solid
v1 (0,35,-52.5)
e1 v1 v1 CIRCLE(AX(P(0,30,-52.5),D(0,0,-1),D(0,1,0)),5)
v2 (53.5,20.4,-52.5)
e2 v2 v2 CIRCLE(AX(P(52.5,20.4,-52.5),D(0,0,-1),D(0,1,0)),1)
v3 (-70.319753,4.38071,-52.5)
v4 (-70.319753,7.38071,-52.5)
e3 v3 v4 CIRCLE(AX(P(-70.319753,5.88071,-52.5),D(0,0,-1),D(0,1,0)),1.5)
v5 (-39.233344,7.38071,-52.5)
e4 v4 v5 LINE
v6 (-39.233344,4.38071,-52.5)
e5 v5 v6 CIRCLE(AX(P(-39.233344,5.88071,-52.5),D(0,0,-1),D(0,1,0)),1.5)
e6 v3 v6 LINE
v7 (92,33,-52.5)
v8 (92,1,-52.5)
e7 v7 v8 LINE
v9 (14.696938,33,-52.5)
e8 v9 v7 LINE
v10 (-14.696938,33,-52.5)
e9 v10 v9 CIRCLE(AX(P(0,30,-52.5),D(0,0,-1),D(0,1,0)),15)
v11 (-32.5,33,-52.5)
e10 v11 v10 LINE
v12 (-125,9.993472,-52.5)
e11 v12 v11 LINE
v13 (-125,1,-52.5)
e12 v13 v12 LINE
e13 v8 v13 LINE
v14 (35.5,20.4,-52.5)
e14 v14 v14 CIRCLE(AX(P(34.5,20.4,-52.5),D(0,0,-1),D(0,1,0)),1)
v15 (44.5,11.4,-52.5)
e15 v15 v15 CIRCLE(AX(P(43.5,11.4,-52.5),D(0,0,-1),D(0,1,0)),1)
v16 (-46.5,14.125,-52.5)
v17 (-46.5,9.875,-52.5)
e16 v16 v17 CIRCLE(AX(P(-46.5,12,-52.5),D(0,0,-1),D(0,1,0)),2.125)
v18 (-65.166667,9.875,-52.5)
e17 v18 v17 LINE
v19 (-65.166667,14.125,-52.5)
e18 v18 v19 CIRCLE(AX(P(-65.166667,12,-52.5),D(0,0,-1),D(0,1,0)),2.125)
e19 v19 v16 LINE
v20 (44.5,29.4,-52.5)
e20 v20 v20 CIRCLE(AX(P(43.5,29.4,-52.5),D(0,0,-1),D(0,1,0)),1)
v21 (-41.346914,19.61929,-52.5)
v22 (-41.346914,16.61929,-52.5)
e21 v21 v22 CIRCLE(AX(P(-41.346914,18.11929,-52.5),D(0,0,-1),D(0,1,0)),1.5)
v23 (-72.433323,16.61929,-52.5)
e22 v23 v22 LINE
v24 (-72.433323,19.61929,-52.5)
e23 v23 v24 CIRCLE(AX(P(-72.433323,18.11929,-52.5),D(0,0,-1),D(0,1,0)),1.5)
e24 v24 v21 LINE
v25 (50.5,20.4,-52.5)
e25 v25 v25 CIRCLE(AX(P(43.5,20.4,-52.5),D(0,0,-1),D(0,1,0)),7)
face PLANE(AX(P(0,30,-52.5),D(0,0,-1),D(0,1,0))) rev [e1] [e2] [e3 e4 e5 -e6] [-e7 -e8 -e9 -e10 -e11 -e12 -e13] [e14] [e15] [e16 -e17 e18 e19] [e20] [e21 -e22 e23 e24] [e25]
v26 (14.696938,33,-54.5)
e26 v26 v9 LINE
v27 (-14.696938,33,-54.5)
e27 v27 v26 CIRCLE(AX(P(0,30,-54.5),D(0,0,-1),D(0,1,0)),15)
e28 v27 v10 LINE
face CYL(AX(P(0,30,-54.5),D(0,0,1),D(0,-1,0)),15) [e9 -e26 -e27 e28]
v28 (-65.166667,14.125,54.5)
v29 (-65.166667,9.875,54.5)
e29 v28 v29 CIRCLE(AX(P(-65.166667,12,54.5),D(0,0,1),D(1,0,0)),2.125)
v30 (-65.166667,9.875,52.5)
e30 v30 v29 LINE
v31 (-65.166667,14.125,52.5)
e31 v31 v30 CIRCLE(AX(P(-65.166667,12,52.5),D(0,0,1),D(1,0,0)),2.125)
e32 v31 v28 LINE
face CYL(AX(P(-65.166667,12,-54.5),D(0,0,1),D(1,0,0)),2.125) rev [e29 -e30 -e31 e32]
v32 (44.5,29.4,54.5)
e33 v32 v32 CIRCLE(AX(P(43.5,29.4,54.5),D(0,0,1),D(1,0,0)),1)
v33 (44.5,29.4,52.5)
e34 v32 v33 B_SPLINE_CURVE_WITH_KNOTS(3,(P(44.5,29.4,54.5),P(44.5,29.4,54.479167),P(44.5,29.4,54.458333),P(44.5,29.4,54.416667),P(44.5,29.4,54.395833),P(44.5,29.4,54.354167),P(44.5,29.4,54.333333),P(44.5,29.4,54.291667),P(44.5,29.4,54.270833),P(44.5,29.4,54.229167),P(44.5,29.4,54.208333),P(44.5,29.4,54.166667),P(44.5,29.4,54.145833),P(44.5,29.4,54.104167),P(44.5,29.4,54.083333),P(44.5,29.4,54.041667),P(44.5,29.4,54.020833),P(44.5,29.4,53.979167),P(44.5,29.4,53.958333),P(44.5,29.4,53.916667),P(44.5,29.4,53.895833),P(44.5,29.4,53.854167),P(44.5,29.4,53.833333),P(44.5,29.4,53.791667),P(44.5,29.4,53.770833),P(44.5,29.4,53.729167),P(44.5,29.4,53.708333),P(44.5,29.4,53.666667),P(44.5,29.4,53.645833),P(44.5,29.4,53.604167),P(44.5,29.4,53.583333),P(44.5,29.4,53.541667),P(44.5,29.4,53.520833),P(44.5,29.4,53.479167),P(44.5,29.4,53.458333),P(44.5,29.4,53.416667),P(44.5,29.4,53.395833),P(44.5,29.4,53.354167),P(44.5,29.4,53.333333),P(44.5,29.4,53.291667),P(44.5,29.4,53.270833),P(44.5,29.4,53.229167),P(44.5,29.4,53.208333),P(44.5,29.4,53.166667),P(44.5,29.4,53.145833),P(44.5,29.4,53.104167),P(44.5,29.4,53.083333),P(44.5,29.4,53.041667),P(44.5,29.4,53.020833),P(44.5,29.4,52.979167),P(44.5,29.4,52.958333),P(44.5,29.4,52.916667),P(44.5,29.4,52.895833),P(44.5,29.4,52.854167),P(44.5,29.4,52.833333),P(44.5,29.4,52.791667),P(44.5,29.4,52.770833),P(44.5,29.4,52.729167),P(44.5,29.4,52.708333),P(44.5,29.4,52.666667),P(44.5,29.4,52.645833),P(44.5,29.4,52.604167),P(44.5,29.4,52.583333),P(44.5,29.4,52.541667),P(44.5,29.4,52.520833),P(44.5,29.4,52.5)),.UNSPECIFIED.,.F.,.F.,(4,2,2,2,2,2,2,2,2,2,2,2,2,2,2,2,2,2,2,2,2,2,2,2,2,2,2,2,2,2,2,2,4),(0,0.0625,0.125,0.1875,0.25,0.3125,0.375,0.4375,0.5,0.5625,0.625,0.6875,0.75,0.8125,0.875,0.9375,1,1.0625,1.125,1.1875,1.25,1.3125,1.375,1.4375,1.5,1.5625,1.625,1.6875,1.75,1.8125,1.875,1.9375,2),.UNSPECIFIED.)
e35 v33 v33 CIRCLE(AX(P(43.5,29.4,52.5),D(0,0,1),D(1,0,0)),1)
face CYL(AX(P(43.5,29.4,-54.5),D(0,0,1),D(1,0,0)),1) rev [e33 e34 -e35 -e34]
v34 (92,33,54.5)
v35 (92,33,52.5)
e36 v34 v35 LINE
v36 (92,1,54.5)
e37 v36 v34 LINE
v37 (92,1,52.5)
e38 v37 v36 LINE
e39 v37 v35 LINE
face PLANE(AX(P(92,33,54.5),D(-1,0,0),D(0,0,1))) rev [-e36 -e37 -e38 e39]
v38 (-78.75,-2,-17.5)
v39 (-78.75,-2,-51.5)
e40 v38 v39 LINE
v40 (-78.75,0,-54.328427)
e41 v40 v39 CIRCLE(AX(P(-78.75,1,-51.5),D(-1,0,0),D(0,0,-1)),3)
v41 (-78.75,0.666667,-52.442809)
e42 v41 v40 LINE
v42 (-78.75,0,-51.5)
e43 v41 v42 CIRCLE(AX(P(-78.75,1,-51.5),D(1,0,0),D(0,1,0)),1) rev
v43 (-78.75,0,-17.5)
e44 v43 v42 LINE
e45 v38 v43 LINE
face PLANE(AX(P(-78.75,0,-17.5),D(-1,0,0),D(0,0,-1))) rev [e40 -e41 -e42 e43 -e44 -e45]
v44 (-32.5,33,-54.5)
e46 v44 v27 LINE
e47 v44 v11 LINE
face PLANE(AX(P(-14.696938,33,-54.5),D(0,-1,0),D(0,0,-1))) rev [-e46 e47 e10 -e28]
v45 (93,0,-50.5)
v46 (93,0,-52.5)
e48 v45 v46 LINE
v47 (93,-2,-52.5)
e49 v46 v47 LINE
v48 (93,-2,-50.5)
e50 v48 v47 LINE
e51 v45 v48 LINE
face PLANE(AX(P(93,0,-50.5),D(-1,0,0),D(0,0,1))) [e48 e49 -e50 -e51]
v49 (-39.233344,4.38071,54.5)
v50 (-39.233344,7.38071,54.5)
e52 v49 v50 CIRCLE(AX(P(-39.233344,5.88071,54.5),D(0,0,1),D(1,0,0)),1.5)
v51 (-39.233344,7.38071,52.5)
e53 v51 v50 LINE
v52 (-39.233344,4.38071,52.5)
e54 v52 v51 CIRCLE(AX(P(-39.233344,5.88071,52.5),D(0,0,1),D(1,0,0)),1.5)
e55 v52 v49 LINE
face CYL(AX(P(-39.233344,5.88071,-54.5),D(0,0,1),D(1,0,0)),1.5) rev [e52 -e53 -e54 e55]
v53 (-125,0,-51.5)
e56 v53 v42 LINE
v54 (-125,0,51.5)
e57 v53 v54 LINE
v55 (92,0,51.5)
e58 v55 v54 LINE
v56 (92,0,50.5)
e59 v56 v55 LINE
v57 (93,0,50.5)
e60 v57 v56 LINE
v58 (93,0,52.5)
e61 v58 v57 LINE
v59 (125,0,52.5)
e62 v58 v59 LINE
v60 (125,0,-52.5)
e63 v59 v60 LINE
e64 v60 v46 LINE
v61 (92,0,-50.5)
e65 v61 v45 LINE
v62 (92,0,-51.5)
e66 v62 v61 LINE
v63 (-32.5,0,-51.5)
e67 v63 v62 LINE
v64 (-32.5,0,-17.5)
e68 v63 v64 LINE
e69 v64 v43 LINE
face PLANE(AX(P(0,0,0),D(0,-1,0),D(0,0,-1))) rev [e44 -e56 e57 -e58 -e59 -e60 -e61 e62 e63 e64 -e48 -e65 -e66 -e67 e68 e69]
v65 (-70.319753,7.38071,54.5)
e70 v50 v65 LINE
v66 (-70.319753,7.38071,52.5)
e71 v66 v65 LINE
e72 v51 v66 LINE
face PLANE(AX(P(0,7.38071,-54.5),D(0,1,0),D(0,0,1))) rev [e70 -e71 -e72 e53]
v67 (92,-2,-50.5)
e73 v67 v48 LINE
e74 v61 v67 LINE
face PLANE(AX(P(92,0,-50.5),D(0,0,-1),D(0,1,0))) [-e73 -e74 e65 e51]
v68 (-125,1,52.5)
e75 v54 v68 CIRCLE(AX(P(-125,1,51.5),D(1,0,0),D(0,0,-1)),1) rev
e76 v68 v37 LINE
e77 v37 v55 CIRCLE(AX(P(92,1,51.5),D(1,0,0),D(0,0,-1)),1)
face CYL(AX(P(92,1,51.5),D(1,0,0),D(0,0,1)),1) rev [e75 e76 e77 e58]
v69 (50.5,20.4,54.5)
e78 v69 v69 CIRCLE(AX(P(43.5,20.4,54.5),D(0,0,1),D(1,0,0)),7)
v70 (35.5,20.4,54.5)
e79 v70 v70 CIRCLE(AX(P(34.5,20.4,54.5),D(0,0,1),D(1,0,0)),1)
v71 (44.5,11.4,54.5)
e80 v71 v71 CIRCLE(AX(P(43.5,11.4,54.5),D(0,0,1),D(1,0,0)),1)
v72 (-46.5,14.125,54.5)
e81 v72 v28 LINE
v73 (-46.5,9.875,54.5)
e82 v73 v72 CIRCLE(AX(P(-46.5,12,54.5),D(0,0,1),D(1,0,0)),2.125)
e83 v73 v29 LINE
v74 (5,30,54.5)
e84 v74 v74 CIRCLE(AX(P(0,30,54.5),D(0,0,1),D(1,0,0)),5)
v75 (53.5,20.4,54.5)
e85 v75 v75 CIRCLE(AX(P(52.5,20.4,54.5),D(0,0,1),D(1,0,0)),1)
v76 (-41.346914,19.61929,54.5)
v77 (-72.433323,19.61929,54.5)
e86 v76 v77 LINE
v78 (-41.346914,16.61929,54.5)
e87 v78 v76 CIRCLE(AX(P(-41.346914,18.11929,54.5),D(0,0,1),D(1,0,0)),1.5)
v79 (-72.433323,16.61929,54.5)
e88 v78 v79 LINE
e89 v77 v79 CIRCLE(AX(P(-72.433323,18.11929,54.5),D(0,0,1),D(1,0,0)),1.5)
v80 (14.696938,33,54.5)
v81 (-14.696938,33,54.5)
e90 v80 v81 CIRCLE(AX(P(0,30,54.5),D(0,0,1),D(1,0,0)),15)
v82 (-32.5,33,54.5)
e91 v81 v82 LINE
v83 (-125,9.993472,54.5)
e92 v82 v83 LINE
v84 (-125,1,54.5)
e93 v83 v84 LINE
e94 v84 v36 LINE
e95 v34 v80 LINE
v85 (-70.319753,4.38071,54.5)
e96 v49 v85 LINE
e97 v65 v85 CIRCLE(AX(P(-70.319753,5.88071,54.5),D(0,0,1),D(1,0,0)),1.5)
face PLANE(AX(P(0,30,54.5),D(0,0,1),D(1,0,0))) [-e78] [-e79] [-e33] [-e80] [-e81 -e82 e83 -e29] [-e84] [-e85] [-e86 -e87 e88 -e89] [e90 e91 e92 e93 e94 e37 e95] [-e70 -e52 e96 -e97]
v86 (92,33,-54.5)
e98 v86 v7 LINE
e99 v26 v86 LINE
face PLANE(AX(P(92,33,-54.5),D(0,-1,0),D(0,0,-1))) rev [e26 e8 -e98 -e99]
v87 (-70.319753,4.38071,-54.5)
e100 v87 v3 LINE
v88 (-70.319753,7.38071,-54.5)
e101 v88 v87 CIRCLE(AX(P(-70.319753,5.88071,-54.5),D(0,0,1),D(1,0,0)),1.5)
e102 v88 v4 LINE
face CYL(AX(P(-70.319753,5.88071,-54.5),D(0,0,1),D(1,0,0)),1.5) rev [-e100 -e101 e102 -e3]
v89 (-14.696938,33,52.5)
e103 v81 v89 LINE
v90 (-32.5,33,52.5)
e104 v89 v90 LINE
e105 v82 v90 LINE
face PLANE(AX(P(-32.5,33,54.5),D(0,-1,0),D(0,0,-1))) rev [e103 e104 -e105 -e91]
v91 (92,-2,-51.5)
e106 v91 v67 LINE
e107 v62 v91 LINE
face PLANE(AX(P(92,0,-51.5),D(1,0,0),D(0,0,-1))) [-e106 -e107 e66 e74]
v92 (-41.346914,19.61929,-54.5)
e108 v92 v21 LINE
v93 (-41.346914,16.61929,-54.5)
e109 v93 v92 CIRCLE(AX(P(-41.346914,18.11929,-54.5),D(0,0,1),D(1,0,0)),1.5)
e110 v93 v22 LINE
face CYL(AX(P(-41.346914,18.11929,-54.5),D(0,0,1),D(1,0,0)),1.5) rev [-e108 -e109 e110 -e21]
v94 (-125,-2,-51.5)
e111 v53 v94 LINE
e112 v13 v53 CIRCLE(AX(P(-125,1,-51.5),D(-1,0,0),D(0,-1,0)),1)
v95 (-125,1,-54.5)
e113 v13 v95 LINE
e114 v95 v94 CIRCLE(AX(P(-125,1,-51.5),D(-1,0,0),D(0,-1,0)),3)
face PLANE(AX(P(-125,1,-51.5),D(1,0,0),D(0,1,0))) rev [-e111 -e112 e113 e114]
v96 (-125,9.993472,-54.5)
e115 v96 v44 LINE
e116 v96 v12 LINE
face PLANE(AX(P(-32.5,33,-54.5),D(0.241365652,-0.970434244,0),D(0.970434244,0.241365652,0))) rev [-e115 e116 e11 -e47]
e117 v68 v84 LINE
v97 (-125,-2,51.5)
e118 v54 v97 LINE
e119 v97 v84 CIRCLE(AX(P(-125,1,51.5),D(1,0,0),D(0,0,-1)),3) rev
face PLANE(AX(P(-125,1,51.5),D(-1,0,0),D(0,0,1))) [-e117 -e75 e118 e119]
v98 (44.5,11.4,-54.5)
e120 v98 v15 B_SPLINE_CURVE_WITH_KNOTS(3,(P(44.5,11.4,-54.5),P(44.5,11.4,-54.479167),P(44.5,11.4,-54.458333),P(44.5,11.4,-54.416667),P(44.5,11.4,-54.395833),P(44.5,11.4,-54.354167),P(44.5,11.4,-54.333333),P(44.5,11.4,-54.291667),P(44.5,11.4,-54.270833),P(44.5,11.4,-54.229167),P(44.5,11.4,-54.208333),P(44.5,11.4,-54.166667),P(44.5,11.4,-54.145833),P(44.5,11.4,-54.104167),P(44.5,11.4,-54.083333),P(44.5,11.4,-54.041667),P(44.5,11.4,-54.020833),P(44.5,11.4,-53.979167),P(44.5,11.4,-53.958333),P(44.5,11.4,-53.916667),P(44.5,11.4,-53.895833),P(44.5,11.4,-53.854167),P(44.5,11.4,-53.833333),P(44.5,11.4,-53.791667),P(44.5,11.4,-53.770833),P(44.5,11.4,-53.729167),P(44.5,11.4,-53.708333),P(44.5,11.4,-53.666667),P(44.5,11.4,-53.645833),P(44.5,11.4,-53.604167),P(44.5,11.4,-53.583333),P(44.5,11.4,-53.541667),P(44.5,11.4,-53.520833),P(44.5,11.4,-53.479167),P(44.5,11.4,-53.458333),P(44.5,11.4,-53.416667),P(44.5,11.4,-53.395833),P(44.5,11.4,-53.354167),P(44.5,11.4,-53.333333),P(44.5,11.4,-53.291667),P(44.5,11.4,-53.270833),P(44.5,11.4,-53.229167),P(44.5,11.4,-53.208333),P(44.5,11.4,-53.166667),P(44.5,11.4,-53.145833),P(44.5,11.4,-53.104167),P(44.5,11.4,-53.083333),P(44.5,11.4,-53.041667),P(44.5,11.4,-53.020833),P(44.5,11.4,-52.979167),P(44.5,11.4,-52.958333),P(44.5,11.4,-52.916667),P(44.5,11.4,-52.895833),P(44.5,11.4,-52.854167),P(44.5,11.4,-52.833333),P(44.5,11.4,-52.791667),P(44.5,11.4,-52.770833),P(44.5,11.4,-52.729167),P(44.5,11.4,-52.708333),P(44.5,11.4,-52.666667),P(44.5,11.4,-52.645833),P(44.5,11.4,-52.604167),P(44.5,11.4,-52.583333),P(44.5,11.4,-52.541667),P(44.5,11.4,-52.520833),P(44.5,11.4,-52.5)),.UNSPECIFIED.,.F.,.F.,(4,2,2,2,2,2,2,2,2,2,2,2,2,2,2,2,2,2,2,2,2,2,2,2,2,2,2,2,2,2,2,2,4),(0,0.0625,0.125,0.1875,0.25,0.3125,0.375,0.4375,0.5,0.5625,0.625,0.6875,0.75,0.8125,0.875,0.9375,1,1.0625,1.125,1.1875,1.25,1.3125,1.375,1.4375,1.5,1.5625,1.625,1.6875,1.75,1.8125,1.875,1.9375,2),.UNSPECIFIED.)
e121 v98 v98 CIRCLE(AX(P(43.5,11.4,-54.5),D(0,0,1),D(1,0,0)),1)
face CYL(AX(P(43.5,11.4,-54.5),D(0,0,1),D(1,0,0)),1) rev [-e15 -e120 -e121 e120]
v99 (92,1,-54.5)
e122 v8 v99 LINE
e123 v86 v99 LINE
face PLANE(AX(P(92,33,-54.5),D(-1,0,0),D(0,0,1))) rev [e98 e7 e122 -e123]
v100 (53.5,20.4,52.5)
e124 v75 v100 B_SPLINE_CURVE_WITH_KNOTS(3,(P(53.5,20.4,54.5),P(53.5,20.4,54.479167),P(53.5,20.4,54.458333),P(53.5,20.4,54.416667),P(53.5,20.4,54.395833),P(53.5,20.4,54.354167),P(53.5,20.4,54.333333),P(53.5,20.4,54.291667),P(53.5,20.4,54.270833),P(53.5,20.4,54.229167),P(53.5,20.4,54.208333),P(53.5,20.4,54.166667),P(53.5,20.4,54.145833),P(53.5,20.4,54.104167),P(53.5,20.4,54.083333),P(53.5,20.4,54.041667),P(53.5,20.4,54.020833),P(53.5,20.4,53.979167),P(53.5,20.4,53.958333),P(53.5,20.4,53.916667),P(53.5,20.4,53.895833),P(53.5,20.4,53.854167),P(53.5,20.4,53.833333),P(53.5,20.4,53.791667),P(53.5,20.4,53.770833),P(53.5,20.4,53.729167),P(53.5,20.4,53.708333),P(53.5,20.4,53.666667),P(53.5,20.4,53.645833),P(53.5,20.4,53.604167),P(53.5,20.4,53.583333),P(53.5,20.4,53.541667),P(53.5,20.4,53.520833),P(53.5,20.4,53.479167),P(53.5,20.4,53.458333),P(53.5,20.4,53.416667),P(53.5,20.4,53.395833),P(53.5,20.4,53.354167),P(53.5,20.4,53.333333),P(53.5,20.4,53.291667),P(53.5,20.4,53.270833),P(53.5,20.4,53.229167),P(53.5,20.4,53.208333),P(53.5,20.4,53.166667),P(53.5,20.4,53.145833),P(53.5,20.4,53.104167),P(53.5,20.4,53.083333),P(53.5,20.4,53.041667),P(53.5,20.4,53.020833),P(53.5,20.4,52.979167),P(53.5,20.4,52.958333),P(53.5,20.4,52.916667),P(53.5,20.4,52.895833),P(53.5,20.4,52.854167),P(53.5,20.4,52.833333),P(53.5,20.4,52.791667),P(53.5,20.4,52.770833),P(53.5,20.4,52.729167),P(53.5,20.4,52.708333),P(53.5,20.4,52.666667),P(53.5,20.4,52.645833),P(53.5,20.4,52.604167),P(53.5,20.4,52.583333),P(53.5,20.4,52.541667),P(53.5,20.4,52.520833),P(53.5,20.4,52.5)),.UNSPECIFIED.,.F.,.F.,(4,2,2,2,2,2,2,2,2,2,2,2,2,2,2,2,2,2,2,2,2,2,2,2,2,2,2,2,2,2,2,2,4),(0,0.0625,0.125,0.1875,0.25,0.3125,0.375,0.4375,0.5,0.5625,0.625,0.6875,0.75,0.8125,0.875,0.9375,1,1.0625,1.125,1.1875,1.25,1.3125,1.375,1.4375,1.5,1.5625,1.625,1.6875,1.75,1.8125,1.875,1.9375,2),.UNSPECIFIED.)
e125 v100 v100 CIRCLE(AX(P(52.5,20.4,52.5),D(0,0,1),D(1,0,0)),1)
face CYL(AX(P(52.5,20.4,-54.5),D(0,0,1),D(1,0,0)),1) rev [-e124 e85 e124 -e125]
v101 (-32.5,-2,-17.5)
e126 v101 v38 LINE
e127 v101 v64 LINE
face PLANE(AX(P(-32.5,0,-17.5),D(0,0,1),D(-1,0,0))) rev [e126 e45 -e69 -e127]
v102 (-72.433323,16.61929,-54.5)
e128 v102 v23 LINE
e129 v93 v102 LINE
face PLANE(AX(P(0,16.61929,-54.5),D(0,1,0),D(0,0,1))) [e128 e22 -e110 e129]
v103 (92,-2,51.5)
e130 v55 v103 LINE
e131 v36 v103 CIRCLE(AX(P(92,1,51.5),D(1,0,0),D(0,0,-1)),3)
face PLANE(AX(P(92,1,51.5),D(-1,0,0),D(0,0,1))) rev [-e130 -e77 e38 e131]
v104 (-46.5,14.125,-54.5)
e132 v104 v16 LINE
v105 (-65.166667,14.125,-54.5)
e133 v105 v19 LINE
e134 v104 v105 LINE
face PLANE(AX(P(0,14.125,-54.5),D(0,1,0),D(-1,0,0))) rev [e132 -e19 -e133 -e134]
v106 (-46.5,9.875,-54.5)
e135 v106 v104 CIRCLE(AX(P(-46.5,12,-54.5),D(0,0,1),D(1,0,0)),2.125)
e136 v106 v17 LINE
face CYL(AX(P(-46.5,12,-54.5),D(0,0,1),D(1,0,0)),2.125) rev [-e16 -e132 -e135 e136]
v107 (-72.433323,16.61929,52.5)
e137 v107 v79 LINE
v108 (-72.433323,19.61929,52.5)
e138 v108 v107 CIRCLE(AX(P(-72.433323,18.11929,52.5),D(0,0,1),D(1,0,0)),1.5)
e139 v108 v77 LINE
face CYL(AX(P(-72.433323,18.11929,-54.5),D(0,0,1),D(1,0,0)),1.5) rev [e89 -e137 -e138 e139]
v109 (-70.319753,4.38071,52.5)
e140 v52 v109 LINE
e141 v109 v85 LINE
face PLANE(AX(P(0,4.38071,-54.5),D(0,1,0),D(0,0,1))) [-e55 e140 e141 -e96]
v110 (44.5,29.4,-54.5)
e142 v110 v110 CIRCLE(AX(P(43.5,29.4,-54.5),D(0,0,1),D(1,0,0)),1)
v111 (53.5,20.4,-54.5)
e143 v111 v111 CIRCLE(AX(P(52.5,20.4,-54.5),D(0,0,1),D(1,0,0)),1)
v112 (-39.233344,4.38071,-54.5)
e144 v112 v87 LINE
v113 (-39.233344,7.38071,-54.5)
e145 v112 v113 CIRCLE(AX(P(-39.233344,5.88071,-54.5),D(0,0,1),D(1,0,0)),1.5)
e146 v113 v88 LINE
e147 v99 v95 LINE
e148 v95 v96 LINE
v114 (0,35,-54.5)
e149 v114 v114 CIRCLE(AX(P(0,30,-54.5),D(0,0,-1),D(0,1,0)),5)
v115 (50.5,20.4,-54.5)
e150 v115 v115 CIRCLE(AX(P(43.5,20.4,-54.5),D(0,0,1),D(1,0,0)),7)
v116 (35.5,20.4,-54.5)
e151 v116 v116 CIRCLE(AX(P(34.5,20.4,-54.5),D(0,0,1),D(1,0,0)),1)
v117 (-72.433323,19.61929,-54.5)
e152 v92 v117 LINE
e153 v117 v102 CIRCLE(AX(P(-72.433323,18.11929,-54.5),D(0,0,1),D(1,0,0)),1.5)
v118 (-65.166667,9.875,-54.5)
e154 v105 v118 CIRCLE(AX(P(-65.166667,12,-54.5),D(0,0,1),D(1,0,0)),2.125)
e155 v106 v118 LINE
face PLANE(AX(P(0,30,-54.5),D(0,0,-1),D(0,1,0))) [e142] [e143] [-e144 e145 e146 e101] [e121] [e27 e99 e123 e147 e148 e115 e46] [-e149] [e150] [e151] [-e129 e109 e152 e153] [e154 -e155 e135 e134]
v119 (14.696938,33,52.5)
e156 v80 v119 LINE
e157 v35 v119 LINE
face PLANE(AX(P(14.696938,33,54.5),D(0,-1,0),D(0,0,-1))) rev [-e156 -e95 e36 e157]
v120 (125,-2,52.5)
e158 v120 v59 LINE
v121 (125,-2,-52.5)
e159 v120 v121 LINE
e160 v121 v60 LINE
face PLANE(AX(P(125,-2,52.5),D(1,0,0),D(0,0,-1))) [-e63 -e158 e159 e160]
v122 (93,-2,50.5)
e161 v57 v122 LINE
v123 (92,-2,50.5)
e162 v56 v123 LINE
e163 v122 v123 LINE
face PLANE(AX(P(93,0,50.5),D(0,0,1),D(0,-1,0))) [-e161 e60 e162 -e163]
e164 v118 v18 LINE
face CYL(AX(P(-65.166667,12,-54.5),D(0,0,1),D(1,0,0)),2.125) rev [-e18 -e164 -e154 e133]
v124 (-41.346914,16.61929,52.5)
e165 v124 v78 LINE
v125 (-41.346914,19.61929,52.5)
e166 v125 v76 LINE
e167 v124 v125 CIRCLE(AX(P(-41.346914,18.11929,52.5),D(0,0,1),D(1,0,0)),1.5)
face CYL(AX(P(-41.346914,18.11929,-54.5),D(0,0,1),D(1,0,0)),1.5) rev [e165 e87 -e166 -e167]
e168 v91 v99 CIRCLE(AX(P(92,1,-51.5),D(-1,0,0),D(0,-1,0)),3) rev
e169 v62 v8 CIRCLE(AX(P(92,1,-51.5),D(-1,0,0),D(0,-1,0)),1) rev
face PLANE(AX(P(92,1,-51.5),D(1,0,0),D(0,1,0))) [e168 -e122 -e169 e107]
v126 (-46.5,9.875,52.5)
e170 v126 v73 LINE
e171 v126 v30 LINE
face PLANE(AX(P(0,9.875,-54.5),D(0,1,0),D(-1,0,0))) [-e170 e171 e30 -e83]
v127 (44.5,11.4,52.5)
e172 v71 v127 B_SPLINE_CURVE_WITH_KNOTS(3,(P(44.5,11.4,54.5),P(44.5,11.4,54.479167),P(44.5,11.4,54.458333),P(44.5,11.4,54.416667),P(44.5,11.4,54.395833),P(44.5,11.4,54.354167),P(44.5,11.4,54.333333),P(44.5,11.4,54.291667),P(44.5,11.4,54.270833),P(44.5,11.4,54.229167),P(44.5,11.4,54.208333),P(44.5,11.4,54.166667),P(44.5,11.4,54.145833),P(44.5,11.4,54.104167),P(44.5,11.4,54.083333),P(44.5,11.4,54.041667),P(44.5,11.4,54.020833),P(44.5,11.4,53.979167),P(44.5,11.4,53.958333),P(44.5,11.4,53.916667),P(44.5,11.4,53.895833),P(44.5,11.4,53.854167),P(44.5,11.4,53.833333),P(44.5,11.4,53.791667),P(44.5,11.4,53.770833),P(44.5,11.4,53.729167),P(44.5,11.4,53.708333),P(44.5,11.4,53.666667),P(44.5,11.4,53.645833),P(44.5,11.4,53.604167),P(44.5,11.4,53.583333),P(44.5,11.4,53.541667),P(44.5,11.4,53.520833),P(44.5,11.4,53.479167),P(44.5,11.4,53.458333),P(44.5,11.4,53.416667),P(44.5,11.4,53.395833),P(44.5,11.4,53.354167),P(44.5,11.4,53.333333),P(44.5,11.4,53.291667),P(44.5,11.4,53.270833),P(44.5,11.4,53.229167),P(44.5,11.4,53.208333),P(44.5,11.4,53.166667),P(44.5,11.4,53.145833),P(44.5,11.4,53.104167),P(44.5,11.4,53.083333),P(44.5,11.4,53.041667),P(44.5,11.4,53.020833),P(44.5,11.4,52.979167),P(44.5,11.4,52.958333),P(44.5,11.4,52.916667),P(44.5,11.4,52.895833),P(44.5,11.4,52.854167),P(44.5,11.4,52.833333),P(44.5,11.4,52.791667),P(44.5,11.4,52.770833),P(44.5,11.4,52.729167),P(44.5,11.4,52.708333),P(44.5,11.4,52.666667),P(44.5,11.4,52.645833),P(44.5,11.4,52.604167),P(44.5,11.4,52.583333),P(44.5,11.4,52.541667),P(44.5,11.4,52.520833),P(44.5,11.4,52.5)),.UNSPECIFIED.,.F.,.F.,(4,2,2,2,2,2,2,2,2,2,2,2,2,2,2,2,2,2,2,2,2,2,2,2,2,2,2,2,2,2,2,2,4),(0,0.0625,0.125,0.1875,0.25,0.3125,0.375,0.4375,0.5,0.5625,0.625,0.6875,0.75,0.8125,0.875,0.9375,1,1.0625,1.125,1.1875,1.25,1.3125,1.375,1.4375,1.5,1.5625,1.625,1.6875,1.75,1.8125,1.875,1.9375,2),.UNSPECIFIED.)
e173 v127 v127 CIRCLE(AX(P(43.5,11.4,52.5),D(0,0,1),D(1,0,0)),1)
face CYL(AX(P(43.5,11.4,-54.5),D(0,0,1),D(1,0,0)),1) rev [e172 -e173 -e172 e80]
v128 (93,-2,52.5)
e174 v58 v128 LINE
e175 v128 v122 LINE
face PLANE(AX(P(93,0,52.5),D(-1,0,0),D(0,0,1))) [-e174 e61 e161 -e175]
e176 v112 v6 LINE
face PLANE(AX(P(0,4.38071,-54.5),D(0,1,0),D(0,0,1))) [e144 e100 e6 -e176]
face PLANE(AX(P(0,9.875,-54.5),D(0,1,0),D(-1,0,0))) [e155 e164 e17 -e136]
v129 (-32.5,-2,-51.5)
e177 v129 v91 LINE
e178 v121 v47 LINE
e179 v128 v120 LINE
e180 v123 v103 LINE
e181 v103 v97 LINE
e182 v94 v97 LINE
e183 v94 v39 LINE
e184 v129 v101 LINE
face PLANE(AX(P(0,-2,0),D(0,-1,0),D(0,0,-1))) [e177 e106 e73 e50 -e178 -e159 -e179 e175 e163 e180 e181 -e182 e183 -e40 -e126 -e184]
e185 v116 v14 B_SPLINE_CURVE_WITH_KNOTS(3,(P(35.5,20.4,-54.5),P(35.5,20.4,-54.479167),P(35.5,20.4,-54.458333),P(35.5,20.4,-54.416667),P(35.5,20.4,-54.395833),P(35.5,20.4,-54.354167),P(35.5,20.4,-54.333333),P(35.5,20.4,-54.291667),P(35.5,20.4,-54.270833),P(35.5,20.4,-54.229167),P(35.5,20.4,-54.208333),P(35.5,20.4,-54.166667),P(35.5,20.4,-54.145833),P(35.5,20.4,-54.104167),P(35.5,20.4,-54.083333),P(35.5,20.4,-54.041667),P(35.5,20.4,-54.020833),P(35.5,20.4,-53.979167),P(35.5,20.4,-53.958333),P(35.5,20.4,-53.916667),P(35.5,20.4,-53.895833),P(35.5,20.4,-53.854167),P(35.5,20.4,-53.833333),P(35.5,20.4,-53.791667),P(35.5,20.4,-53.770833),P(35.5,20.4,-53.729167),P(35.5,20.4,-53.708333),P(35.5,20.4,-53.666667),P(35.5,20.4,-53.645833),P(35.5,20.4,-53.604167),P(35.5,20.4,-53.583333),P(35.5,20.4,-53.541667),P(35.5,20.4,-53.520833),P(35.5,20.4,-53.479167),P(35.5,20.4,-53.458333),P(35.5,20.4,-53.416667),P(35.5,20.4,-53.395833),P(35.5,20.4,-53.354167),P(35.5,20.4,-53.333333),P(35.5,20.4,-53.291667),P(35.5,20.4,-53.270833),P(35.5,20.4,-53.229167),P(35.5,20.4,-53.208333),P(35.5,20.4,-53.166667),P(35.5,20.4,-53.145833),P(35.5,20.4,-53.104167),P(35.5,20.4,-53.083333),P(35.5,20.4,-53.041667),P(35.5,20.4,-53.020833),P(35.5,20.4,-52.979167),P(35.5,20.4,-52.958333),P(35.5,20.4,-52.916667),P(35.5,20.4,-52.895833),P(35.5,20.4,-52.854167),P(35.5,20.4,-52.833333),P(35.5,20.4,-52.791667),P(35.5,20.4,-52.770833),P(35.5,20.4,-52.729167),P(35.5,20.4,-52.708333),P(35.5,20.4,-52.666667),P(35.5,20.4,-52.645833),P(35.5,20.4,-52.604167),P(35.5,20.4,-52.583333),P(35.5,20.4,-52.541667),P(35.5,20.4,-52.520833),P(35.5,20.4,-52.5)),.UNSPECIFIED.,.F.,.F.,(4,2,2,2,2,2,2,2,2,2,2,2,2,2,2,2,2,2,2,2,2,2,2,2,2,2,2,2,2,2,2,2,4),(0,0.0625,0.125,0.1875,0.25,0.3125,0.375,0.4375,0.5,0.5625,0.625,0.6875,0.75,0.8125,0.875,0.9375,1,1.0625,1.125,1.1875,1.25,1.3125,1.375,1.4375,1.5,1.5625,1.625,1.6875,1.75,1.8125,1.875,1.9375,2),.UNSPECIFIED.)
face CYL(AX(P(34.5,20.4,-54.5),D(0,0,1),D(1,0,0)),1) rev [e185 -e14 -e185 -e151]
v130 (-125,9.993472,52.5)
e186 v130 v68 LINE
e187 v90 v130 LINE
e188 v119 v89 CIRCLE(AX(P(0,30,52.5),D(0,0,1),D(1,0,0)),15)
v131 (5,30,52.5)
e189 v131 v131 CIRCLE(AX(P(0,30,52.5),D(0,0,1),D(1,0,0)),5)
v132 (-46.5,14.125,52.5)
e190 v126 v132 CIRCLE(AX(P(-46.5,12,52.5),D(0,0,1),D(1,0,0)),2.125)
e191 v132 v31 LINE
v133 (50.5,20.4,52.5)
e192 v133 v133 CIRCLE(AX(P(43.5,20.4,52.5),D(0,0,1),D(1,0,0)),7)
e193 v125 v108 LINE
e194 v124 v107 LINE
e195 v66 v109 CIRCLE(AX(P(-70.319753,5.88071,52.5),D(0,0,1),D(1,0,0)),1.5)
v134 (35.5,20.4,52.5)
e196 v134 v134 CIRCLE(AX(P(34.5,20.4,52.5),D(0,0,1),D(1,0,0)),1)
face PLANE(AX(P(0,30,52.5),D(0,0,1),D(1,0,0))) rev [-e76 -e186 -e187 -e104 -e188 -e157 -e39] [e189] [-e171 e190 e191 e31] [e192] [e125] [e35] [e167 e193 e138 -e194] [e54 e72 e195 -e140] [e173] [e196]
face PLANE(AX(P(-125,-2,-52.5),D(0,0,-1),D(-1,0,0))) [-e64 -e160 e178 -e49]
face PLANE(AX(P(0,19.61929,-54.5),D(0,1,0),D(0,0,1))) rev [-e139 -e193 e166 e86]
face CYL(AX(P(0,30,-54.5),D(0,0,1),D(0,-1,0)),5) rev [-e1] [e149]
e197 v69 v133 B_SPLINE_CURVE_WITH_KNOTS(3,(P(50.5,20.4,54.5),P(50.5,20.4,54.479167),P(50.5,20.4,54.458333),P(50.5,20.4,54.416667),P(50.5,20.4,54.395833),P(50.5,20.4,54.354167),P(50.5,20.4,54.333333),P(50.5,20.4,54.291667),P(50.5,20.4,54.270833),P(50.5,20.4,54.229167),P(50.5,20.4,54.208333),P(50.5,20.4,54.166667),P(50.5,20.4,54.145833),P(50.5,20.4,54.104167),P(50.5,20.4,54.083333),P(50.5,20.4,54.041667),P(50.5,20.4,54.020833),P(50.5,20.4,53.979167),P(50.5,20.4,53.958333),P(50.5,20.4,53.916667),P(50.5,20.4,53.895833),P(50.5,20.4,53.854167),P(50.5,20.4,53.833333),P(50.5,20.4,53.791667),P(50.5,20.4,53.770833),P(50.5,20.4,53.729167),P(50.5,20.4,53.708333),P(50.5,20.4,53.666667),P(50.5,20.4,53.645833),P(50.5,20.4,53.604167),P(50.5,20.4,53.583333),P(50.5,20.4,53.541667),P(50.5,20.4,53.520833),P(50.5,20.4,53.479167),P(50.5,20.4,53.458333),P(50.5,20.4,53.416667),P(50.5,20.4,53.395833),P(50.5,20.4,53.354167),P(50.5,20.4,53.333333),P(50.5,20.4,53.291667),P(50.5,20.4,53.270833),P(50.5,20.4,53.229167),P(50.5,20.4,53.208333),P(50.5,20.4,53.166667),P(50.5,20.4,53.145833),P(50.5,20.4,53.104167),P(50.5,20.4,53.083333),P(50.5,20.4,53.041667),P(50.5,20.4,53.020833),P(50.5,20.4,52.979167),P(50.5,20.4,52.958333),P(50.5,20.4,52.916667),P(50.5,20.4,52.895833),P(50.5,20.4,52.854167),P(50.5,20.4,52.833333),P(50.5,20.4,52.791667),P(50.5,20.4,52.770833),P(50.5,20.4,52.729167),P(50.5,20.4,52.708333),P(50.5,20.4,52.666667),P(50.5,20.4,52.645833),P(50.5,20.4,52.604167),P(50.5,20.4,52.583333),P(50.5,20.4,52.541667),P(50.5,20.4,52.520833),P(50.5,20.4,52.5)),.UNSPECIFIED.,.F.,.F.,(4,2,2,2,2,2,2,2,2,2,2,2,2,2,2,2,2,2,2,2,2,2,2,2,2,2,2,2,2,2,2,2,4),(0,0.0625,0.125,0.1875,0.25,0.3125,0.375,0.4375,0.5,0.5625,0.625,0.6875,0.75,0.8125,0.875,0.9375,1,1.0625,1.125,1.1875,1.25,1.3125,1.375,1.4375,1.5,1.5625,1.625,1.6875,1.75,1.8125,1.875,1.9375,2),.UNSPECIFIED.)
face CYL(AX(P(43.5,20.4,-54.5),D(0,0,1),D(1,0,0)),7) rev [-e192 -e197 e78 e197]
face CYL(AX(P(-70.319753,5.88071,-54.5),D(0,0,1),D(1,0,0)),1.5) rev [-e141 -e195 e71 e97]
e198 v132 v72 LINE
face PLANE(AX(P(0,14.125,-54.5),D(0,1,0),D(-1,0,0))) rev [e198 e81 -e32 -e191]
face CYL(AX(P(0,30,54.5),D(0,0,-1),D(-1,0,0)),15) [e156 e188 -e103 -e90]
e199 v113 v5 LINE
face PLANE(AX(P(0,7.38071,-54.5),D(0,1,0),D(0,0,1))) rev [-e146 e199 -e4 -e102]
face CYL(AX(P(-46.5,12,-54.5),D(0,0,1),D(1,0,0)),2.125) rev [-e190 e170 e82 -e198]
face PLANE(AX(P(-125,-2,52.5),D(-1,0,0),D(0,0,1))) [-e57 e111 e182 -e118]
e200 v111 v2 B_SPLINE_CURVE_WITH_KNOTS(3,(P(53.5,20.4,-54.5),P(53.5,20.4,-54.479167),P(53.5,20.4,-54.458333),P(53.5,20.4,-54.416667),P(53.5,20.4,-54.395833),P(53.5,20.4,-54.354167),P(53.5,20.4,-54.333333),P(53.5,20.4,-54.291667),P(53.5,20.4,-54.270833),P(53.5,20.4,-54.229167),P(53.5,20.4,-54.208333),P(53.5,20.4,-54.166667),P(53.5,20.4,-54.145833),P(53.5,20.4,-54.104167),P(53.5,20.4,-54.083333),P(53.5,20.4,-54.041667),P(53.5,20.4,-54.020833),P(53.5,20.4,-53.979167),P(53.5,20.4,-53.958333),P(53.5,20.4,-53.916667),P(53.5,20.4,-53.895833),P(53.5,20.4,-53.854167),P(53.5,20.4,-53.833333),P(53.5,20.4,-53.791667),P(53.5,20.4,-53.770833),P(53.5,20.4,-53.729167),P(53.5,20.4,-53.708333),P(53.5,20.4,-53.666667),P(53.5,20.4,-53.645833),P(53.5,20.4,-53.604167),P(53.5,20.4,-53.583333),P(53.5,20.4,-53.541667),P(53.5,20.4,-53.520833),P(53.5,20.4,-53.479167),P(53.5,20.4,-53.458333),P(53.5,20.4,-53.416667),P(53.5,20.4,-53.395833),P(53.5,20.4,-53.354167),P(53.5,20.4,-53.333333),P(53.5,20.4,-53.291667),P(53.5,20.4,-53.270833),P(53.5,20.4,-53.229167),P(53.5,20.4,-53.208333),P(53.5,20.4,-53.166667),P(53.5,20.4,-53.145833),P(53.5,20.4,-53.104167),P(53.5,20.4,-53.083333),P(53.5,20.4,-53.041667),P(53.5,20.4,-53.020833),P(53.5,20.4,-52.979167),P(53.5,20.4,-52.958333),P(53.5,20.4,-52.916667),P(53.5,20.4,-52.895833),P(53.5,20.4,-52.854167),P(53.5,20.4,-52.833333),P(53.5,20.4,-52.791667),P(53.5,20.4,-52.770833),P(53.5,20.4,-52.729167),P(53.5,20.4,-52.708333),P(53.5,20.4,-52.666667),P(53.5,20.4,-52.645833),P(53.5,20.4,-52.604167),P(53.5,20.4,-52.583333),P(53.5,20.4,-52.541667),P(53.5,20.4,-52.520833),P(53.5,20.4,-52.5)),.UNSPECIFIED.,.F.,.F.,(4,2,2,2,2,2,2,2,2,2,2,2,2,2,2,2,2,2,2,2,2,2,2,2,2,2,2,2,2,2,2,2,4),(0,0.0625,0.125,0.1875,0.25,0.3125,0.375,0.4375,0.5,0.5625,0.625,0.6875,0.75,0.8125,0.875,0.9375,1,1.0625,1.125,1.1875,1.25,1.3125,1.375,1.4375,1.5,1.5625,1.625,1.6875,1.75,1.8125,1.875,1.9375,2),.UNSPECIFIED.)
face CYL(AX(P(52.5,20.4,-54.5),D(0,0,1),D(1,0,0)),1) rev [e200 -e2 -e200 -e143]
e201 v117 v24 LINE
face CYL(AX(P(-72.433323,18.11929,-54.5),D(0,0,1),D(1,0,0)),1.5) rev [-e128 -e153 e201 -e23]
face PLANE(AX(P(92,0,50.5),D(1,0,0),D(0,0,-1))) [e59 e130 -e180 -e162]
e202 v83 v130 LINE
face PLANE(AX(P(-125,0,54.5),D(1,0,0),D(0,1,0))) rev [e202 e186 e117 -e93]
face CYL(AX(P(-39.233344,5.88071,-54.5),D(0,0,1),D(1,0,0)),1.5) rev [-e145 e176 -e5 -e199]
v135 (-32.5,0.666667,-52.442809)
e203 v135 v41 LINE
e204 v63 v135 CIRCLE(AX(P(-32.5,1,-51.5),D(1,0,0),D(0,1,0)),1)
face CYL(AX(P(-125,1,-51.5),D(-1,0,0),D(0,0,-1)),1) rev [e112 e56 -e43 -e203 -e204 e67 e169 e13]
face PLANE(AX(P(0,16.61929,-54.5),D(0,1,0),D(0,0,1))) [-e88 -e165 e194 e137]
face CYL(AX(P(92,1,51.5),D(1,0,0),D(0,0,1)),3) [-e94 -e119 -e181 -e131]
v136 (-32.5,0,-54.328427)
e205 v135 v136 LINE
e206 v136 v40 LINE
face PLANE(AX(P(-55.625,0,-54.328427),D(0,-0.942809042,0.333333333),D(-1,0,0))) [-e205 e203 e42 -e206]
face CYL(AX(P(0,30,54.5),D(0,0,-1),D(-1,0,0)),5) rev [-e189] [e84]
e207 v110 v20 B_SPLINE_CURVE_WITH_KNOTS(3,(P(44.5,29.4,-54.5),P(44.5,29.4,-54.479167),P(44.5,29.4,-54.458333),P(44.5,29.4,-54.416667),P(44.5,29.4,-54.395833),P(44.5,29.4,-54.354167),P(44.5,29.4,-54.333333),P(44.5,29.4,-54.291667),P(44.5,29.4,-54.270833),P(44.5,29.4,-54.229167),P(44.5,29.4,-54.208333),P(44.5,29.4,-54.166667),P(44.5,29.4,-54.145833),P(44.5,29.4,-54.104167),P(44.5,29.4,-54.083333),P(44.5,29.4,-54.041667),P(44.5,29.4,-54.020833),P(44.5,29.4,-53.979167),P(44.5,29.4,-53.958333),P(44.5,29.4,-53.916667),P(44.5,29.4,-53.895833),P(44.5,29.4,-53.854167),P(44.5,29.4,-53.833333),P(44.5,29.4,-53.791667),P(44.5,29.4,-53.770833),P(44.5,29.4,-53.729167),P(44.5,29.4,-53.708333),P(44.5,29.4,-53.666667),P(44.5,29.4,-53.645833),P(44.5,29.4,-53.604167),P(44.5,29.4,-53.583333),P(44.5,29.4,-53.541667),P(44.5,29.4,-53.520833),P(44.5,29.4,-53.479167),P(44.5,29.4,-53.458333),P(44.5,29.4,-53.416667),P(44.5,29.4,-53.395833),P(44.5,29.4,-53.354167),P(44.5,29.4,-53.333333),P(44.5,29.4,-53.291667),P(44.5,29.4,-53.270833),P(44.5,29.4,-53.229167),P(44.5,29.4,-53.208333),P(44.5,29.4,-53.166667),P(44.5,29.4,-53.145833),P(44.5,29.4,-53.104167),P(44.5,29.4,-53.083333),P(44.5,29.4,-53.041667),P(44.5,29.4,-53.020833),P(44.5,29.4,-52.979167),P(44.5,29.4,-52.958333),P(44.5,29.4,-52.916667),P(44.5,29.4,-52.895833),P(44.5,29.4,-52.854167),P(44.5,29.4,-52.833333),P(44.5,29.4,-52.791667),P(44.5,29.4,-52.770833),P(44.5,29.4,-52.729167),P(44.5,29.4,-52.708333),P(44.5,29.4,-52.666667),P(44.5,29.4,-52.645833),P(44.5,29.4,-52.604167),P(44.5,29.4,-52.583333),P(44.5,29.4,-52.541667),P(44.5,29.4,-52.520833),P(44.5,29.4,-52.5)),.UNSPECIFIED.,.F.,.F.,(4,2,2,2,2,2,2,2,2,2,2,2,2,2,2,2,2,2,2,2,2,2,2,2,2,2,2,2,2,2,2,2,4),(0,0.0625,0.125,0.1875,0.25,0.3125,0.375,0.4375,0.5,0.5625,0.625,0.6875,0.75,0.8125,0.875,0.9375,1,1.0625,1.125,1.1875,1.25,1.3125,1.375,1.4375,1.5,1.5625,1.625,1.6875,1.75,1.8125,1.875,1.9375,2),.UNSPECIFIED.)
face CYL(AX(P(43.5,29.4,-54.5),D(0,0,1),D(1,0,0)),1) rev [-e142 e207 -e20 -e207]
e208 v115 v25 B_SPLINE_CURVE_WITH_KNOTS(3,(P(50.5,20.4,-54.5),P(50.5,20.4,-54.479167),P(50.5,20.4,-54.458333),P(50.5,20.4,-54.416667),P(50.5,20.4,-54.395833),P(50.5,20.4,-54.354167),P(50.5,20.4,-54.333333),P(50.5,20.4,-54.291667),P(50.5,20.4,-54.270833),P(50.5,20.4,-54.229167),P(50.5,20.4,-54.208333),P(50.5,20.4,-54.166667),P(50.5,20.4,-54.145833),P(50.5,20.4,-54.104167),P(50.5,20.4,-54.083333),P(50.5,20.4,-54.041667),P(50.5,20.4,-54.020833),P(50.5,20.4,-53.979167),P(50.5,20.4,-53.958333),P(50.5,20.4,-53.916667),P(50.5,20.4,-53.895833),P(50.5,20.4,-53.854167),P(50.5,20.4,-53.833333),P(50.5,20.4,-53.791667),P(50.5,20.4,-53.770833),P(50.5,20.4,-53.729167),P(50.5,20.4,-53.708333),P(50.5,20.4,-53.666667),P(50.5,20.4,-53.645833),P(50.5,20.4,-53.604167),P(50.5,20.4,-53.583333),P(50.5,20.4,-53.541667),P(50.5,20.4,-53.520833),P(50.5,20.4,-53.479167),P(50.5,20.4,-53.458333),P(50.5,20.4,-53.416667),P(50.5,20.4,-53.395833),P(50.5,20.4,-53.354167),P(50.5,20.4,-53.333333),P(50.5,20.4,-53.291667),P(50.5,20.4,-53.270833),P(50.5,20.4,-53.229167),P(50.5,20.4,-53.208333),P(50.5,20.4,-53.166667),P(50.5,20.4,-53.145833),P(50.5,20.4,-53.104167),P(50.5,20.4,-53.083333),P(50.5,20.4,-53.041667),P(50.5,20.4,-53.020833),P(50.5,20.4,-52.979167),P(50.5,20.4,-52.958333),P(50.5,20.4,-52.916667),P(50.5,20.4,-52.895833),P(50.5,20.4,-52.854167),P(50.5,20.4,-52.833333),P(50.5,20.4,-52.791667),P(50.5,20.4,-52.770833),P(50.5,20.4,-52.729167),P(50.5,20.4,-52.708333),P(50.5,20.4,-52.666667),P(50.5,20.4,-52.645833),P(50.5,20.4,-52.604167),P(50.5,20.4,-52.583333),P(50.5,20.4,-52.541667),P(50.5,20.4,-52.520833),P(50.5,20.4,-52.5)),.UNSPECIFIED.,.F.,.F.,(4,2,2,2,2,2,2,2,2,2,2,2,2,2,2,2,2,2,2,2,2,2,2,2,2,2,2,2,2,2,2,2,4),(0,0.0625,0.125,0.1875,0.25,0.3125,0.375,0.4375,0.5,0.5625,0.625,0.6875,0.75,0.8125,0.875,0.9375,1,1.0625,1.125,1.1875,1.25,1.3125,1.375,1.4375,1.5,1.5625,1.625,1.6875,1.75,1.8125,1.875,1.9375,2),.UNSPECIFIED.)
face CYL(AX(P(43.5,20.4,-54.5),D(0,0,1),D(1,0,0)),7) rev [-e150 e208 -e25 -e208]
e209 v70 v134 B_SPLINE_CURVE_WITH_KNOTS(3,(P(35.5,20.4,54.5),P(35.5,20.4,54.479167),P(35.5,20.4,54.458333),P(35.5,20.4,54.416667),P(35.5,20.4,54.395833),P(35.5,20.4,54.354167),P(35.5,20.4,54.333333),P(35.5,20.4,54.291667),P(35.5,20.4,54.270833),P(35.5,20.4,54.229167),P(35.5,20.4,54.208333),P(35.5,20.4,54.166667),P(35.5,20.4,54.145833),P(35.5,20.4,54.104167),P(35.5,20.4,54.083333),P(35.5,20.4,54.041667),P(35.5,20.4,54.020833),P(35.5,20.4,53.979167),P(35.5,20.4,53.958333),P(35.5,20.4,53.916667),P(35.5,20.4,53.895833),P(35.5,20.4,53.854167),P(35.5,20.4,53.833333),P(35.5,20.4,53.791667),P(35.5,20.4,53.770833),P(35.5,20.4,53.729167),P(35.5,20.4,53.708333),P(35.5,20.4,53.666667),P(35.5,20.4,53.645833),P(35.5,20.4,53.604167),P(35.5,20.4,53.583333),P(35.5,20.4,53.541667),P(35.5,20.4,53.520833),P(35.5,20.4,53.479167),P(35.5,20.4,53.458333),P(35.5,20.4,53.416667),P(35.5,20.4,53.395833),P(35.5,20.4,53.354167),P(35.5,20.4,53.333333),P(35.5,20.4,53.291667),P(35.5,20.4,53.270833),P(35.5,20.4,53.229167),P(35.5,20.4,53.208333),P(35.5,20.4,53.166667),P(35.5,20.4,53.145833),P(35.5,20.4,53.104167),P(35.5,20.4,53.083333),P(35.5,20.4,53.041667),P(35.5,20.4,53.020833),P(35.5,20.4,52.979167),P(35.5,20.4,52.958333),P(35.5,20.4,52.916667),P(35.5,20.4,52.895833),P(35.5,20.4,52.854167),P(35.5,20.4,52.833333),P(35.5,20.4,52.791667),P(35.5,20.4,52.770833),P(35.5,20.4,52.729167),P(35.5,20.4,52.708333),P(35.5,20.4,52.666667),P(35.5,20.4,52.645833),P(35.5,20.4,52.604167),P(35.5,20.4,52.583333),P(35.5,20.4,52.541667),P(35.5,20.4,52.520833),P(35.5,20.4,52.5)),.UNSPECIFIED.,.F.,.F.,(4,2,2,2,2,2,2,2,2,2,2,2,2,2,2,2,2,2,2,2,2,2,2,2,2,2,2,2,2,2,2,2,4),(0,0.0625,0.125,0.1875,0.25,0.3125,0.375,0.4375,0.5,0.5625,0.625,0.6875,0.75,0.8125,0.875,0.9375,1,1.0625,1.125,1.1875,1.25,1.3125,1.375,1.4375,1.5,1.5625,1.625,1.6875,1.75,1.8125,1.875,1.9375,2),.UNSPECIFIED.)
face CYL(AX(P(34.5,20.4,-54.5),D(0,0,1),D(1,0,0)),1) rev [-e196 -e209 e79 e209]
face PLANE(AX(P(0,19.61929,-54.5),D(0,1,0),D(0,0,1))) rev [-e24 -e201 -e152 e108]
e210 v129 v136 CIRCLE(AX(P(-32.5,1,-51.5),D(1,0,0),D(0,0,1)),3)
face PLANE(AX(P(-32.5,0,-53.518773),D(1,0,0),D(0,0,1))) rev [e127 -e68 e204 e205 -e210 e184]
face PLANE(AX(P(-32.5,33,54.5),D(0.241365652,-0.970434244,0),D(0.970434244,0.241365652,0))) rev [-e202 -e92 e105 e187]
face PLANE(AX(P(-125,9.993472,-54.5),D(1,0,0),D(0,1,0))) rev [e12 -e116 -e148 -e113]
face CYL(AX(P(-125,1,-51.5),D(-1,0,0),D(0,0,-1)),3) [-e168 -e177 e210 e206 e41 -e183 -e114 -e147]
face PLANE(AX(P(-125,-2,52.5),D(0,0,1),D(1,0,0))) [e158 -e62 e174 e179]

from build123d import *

# Parameters (mm, degrees)
SKETCH3_W                       = 250
SKETCH3_H                       = 105
BASE_FLANGE1_DEPTH              = 2
EDGE_FLANGE1_STRIP_W            = 10
EDGE_FLANGE1_STRIP_H            = 2
EDGE_FLANGE1_STRIP_CUT_DEPTH    = 217
EDGE_FLANGE1_RELIEF_W           = 11
EDGE_FLANGE1_RELIEF_H           = 1
EDGE_FLANGE1_RELIEF_CUT_DEPTH   = 2
EDGE_FLANGE1_STRIP_2_W          = 10
EDGE_FLANGE1_STRIP_2_H          = 2
EDGE_FLANGE1_STRIP_CUT_2_DEPTH  = 217
EDGE_FLANGE1_RELIEF_2_W         = 11
EDGE_FLANGE1_RELIEF_2_H         = 1
EDGE_FLANGE1_RELIEF_CUT_2_DEPTH = 2
EDGE_FLANGE1_DEPTH              = 217
EDGE_FLANGE1_START              = 2
EDGE_FLANGE1_PROFILE_R          = 5
EDGE_FLANGE1_FLAT_DEPTH         = 2
EDGE_FLANGE1_BEND_DEPTH         = 217
EDGE_FLANGE1_PROFILE_2_R        = 5
EDGE_FLANGE1_FLAT_2_DEPTH       = 2
CUT_EXTRUDE2_START              = -78.75
CUT_EXTRUDE2_DEPTH              = 46.25
CUT_EXTRUDE1_DEPTH              = 144.597527834
CUT_EXTRUDE1_DEPTH_BACK         = 144.597527834
SKETCH14_R                      = 1
SKETCH14_R_2                    = 7


# Read off the part's stored shape, not the designer's step: Cut-Extrude2
# Sheet-metal steps are written as plain solids
with BuildPart() as part:
    # Sketch3 → Base-Flange1 (new body)
    with BuildSketch(Plane(origin=(0, 0, 0), x_dir=(1, 0, 0), z_dir=(0, 1, 0))):
        Rectangle(SKETCH3_W, SKETCH3_H)
    extrude(amount=-BASE_FLANGE1_DEPTH)

    # Edge-Flange1 strip (across the edge) → Edge-Flange1 strip cut (cut)
    with BuildSketch(Plane(origin=(-125, 0, 52.5), x_dir=(0, 0, -1), z_dir=(1, 0, 0))):
        with Locations((-4, -1)):
            Rectangle(EDGE_FLANGE1_STRIP_W, EDGE_FLANGE1_STRIP_H)
    extrude(amount=EDGE_FLANGE1_STRIP_CUT_DEPTH, mode=Mode.SUBTRACT)

    # Edge-Flange1 relief (on the sheet) → Edge-Flange1 relief cut (cut)
    with BuildSketch(Plane(origin=(-125, 0, 51.5), x_dir=(0, 0, -1), z_dir=(0, 1, 0))):
        with Locations((-4.5, -217.5)):
            Rectangle(EDGE_FLANGE1_RELIEF_W, EDGE_FLANGE1_RELIEF_H)
    extrude(amount=-EDGE_FLANGE1_RELIEF_CUT_DEPTH, mode=Mode.SUBTRACT)

    # Edge-Flange1 strip 2 (across the edge) → Edge-Flange1 strip cut 2 (cut)
    with BuildSketch(Plane(origin=(92, 0, -52.5), x_dir=(0, 0, 1), z_dir=(-1, 0, 0))):
        with Locations((-4, -1)):
            Rectangle(EDGE_FLANGE1_STRIP_2_W, EDGE_FLANGE1_STRIP_2_H)
    extrude(amount=EDGE_FLANGE1_STRIP_CUT_2_DEPTH, mode=Mode.SUBTRACT)

    # Edge-Flange1 relief 2 (on the sheet) → Edge-Flange1 relief cut 2 (cut)
    with BuildSketch(Plane(origin=(92, 0, -51.5), x_dir=(0, 0, 1), z_dir=(0, 1, 0))):
        with Locations((-4.5, 0.5)):
            Rectangle(EDGE_FLANGE1_RELIEF_2_W, EDGE_FLANGE1_RELIEF_2_H)
    extrude(amount=-EDGE_FLANGE1_RELIEF_CUT_2_DEPTH, mode=Mode.SUBTRACT)

    # Edge-Flange1 bend section (across the edge) → Edge-Flange1 (add)
    with BuildSketch(Plane(origin=(-125, 0, 52.5), x_dir=(0, 0, -1), z_dir=(1, 0, 0))):
        with BuildLine():
            Line((-2, 1), (0, 1))
            ThreePointArc((0, 1), (0.292893219, 0.292893219), (1, 0))
            Line((1, 0), (1, -2))
            ThreePointArc((1, -2), (-1.121320344, -1.121320344), (-2, 1))
        make_face()
    extrude(amount=EDGE_FLANGE1_DEPTH)

    # Edge-Flange1 profile (on flange) → Edge-Flange1 flat (add)
    with BuildSketch(Plane.XY.offset(52.5).offset(EDGE_FLANGE1_START)):
        with BuildLine():
            Line((-125, 9.993471807), (-125, 1))
            Line((-125, 1), (92, 1))
            Line((92, 1), (92, 33))
            Line((92, 33), (14.696938457, 33))
            ThreePointArc((14.696938457, 33), (0, 45), (-14.696938457, 33))
            Line((-14.696938457, 33), (-32.5, 33))
            Line((-32.5, 33), (-125, 9.993471807))
        make_face()
        with Locations((0, 30)):
            Circle(EDGE_FLANGE1_PROFILE_R, mode=Mode.SUBTRACT)
    extrude(amount=-EDGE_FLANGE1_FLAT_DEPTH)

    # Edge-Flange1 bend section 2 (across the edge) → Edge-Flange1 bend (add)
    with BuildSketch(Plane(origin=(92, 0, -52.5), x_dir=(0, 0, 1), z_dir=(-1, 0, 0))):
        with BuildLine():
            Line((-2, 1), (0, 1))
            ThreePointArc((0, 1), (0.292893219, 0.292893219), (1, 0))
            Line((1, 0), (1, -2))
            ThreePointArc((1, -2), (-1.121320344, -1.121320344), (-2, 1))
        make_face()
    extrude(amount=EDGE_FLANGE1_BEND_DEPTH)

    # Edge-Flange1 profile 2 (on flange) → Edge-Flange1 flat 2 (add)
    with BuildSketch(Plane(origin=(0, 0, -52.5), x_dir=(-1, 0, 0), z_dir=(0, 0, -1)).offset(EDGE_FLANGE1_START)):
        with BuildLine():
            Line((-92, 33), (-92, 1))
            Line((-92, 1), (125, 1))
            Line((125, 1), (125, 9.993471807))
            Line((125, 9.993471807), (32.5, 33))
            Line((32.5, 33), (14.696938457, 33))
            ThreePointArc((14.696938457, 33), (0, 45), (-14.696938457, 33))
            Line((-14.696938457, 33), (-92, 33))
        make_face()
        with Locations((0, 30)):
            Circle(EDGE_FLANGE1_PROFILE_2_R, mode=Mode.SUBTRACT)
    extrude(amount=-EDGE_FLANGE1_FLAT_2_DEPTH)

    # Cut-Extrude2 outline → Cut-Extrude2 (cut)
    with BuildSketch(Plane.YZ.offset(CUT_EXTRUDE2_START)):
        with BuildLine():
            Line((0, -54.328427125), (0.666666667, -52.442809042))
            ThreePointArc((0.666666667, -52.442809042), (0.183503419, -52.077350269), (0, -51.5))
            Line((0, -51.5), (0, -17.5))
            Line((0, -17.5), (-2, -17.5))
            Line((-2, -17.5), (-2, -51.5))
            ThreePointArc((-2, -51.5), (-1.449489743, -53.232050808), (0, -54.328427125))
        make_face()
    extrude(amount=CUT_EXTRUDE2_DEPTH, mode=Mode.SUBTRACT)

    # Sketch14 → Cut-Extrude1 (cut, two sides: drawn at the far end of the back side and taken through both)
    with BuildSketch(Plane.XY.offset(-CUT_EXTRUDE1_DEPTH_BACK)):
        with BuildLine():
            Line((-46.5, 14.125), (-65.166666667, 14.125))
            ThreePointArc((-65.166666667, 14.125), (-67.291666667, 12), (-65.166666667, 9.875))
            Line((-65.166666667, 9.875), (-46.5, 9.875))
            ThreePointArc((-46.5, 9.875), (-44.375, 12), (-46.5, 14.125))
        make_face()
        with BuildLine():
            Line((-57.900010285, 4.380710415), (-51.653085966, 4.380710415))
            ThreePointArc((-51.653085966, 4.380710415), (-50.153085966, 5.880710415), (-51.653085966, 7.380710415))
            Line((-51.653085966, 7.380710415), (-57.900010285, 7.380710415))
            ThreePointArc((-57.900010285, 7.380710415), (-59.400010285, 5.880710415), (-57.900010285, 4.380710415))
        make_face()
        with BuildLine():
            Line((-51.653085966, 4.380710415), (-39.233343618, 4.380710415))
            ThreePointArc((-39.233343618, 4.380710415), (-37.733343618, 5.880710415), (-39.233343618, 7.380710415))
            Line((-39.233343618, 7.380710415), (-51.653085966, 7.380710415))
            ThreePointArc((-51.653085966, 7.380710415), (-50.153085966, 5.880710415), (-51.653085966, 4.380710415))
        make_face()
        with BuildLine():
            Line((-70.319752633, 4.380710415), (-57.900010285, 4.380710415))
            ThreePointArc((-57.900010285, 4.380710415), (-59.400010285, 5.880710415), (-57.900010285, 7.380710415))
            Line((-57.900010285, 7.380710415), (-70.319752633, 7.380710415))
            ThreePointArc((-70.319752633, 7.380710415), (-71.819752633, 5.880710415), (-70.319752633, 4.380710415))
        make_face()
        with BuildLine():
            Line((-72.433323049, 16.619289585), (-60.0135807, 16.619289585))
            ThreePointArc((-60.0135807, 16.619289585), (-61.5135807, 18.119289585), (-60.0135807, 19.619289585))
            Line((-60.0135807, 19.619289585), (-72.433323049, 19.619289585))
            ThreePointArc((-72.433323049, 19.619289585), (-73.933323049, 18.119289585), (-72.433323049, 16.619289585))
        make_face()
        with BuildLine():
            Line((-60.0135807, 16.619289585), (-53.766656382, 16.619289585))
            ThreePointArc((-53.766656382, 16.619289585), (-52.266656382, 18.119289585), (-53.766656382, 19.619289585))
            Line((-53.766656382, 19.619289585), (-60.0135807, 19.619289585))
            ThreePointArc((-60.0135807, 19.619289585), (-61.5135807, 18.119289585), (-60.0135807, 16.619289585))
        make_face()
        with BuildLine():
            ThreePointArc((-53.766656382, 19.619289585), (-52.266656382, 18.119289585), (-53.766656382, 16.619289585))
            Line((-53.766656382, 16.619289585), (-41.346914034, 16.619289585))
            ThreePointArc((-41.346914034, 16.619289585), (-39.846914034, 18.119289585), (-41.346914034, 19.619289585))
            Line((-41.346914034, 19.619289585), (-53.766656382, 19.619289585))
        make_face()
        with Locations((43.5, 11.4)):
            Circle(SKETCH14_R)
        with Locations((52.5, 20.4)):
            Circle(SKETCH14_R)
        with Locations((43.5, 20.4)):
            Circle(SKETCH14_R_2)
        with Locations((34.5, 20.4)):
            Circle(SKETCH14_R)
        with Locations((43.5, 29.4)):
            Circle(SKETCH14_R)
    extrude(amount=CUT_EXTRUDE1_DEPTH + CUT_EXTRUDE1_DEPTH_BACK, mode=Mode.SUBTRACT)


solid = part.part
